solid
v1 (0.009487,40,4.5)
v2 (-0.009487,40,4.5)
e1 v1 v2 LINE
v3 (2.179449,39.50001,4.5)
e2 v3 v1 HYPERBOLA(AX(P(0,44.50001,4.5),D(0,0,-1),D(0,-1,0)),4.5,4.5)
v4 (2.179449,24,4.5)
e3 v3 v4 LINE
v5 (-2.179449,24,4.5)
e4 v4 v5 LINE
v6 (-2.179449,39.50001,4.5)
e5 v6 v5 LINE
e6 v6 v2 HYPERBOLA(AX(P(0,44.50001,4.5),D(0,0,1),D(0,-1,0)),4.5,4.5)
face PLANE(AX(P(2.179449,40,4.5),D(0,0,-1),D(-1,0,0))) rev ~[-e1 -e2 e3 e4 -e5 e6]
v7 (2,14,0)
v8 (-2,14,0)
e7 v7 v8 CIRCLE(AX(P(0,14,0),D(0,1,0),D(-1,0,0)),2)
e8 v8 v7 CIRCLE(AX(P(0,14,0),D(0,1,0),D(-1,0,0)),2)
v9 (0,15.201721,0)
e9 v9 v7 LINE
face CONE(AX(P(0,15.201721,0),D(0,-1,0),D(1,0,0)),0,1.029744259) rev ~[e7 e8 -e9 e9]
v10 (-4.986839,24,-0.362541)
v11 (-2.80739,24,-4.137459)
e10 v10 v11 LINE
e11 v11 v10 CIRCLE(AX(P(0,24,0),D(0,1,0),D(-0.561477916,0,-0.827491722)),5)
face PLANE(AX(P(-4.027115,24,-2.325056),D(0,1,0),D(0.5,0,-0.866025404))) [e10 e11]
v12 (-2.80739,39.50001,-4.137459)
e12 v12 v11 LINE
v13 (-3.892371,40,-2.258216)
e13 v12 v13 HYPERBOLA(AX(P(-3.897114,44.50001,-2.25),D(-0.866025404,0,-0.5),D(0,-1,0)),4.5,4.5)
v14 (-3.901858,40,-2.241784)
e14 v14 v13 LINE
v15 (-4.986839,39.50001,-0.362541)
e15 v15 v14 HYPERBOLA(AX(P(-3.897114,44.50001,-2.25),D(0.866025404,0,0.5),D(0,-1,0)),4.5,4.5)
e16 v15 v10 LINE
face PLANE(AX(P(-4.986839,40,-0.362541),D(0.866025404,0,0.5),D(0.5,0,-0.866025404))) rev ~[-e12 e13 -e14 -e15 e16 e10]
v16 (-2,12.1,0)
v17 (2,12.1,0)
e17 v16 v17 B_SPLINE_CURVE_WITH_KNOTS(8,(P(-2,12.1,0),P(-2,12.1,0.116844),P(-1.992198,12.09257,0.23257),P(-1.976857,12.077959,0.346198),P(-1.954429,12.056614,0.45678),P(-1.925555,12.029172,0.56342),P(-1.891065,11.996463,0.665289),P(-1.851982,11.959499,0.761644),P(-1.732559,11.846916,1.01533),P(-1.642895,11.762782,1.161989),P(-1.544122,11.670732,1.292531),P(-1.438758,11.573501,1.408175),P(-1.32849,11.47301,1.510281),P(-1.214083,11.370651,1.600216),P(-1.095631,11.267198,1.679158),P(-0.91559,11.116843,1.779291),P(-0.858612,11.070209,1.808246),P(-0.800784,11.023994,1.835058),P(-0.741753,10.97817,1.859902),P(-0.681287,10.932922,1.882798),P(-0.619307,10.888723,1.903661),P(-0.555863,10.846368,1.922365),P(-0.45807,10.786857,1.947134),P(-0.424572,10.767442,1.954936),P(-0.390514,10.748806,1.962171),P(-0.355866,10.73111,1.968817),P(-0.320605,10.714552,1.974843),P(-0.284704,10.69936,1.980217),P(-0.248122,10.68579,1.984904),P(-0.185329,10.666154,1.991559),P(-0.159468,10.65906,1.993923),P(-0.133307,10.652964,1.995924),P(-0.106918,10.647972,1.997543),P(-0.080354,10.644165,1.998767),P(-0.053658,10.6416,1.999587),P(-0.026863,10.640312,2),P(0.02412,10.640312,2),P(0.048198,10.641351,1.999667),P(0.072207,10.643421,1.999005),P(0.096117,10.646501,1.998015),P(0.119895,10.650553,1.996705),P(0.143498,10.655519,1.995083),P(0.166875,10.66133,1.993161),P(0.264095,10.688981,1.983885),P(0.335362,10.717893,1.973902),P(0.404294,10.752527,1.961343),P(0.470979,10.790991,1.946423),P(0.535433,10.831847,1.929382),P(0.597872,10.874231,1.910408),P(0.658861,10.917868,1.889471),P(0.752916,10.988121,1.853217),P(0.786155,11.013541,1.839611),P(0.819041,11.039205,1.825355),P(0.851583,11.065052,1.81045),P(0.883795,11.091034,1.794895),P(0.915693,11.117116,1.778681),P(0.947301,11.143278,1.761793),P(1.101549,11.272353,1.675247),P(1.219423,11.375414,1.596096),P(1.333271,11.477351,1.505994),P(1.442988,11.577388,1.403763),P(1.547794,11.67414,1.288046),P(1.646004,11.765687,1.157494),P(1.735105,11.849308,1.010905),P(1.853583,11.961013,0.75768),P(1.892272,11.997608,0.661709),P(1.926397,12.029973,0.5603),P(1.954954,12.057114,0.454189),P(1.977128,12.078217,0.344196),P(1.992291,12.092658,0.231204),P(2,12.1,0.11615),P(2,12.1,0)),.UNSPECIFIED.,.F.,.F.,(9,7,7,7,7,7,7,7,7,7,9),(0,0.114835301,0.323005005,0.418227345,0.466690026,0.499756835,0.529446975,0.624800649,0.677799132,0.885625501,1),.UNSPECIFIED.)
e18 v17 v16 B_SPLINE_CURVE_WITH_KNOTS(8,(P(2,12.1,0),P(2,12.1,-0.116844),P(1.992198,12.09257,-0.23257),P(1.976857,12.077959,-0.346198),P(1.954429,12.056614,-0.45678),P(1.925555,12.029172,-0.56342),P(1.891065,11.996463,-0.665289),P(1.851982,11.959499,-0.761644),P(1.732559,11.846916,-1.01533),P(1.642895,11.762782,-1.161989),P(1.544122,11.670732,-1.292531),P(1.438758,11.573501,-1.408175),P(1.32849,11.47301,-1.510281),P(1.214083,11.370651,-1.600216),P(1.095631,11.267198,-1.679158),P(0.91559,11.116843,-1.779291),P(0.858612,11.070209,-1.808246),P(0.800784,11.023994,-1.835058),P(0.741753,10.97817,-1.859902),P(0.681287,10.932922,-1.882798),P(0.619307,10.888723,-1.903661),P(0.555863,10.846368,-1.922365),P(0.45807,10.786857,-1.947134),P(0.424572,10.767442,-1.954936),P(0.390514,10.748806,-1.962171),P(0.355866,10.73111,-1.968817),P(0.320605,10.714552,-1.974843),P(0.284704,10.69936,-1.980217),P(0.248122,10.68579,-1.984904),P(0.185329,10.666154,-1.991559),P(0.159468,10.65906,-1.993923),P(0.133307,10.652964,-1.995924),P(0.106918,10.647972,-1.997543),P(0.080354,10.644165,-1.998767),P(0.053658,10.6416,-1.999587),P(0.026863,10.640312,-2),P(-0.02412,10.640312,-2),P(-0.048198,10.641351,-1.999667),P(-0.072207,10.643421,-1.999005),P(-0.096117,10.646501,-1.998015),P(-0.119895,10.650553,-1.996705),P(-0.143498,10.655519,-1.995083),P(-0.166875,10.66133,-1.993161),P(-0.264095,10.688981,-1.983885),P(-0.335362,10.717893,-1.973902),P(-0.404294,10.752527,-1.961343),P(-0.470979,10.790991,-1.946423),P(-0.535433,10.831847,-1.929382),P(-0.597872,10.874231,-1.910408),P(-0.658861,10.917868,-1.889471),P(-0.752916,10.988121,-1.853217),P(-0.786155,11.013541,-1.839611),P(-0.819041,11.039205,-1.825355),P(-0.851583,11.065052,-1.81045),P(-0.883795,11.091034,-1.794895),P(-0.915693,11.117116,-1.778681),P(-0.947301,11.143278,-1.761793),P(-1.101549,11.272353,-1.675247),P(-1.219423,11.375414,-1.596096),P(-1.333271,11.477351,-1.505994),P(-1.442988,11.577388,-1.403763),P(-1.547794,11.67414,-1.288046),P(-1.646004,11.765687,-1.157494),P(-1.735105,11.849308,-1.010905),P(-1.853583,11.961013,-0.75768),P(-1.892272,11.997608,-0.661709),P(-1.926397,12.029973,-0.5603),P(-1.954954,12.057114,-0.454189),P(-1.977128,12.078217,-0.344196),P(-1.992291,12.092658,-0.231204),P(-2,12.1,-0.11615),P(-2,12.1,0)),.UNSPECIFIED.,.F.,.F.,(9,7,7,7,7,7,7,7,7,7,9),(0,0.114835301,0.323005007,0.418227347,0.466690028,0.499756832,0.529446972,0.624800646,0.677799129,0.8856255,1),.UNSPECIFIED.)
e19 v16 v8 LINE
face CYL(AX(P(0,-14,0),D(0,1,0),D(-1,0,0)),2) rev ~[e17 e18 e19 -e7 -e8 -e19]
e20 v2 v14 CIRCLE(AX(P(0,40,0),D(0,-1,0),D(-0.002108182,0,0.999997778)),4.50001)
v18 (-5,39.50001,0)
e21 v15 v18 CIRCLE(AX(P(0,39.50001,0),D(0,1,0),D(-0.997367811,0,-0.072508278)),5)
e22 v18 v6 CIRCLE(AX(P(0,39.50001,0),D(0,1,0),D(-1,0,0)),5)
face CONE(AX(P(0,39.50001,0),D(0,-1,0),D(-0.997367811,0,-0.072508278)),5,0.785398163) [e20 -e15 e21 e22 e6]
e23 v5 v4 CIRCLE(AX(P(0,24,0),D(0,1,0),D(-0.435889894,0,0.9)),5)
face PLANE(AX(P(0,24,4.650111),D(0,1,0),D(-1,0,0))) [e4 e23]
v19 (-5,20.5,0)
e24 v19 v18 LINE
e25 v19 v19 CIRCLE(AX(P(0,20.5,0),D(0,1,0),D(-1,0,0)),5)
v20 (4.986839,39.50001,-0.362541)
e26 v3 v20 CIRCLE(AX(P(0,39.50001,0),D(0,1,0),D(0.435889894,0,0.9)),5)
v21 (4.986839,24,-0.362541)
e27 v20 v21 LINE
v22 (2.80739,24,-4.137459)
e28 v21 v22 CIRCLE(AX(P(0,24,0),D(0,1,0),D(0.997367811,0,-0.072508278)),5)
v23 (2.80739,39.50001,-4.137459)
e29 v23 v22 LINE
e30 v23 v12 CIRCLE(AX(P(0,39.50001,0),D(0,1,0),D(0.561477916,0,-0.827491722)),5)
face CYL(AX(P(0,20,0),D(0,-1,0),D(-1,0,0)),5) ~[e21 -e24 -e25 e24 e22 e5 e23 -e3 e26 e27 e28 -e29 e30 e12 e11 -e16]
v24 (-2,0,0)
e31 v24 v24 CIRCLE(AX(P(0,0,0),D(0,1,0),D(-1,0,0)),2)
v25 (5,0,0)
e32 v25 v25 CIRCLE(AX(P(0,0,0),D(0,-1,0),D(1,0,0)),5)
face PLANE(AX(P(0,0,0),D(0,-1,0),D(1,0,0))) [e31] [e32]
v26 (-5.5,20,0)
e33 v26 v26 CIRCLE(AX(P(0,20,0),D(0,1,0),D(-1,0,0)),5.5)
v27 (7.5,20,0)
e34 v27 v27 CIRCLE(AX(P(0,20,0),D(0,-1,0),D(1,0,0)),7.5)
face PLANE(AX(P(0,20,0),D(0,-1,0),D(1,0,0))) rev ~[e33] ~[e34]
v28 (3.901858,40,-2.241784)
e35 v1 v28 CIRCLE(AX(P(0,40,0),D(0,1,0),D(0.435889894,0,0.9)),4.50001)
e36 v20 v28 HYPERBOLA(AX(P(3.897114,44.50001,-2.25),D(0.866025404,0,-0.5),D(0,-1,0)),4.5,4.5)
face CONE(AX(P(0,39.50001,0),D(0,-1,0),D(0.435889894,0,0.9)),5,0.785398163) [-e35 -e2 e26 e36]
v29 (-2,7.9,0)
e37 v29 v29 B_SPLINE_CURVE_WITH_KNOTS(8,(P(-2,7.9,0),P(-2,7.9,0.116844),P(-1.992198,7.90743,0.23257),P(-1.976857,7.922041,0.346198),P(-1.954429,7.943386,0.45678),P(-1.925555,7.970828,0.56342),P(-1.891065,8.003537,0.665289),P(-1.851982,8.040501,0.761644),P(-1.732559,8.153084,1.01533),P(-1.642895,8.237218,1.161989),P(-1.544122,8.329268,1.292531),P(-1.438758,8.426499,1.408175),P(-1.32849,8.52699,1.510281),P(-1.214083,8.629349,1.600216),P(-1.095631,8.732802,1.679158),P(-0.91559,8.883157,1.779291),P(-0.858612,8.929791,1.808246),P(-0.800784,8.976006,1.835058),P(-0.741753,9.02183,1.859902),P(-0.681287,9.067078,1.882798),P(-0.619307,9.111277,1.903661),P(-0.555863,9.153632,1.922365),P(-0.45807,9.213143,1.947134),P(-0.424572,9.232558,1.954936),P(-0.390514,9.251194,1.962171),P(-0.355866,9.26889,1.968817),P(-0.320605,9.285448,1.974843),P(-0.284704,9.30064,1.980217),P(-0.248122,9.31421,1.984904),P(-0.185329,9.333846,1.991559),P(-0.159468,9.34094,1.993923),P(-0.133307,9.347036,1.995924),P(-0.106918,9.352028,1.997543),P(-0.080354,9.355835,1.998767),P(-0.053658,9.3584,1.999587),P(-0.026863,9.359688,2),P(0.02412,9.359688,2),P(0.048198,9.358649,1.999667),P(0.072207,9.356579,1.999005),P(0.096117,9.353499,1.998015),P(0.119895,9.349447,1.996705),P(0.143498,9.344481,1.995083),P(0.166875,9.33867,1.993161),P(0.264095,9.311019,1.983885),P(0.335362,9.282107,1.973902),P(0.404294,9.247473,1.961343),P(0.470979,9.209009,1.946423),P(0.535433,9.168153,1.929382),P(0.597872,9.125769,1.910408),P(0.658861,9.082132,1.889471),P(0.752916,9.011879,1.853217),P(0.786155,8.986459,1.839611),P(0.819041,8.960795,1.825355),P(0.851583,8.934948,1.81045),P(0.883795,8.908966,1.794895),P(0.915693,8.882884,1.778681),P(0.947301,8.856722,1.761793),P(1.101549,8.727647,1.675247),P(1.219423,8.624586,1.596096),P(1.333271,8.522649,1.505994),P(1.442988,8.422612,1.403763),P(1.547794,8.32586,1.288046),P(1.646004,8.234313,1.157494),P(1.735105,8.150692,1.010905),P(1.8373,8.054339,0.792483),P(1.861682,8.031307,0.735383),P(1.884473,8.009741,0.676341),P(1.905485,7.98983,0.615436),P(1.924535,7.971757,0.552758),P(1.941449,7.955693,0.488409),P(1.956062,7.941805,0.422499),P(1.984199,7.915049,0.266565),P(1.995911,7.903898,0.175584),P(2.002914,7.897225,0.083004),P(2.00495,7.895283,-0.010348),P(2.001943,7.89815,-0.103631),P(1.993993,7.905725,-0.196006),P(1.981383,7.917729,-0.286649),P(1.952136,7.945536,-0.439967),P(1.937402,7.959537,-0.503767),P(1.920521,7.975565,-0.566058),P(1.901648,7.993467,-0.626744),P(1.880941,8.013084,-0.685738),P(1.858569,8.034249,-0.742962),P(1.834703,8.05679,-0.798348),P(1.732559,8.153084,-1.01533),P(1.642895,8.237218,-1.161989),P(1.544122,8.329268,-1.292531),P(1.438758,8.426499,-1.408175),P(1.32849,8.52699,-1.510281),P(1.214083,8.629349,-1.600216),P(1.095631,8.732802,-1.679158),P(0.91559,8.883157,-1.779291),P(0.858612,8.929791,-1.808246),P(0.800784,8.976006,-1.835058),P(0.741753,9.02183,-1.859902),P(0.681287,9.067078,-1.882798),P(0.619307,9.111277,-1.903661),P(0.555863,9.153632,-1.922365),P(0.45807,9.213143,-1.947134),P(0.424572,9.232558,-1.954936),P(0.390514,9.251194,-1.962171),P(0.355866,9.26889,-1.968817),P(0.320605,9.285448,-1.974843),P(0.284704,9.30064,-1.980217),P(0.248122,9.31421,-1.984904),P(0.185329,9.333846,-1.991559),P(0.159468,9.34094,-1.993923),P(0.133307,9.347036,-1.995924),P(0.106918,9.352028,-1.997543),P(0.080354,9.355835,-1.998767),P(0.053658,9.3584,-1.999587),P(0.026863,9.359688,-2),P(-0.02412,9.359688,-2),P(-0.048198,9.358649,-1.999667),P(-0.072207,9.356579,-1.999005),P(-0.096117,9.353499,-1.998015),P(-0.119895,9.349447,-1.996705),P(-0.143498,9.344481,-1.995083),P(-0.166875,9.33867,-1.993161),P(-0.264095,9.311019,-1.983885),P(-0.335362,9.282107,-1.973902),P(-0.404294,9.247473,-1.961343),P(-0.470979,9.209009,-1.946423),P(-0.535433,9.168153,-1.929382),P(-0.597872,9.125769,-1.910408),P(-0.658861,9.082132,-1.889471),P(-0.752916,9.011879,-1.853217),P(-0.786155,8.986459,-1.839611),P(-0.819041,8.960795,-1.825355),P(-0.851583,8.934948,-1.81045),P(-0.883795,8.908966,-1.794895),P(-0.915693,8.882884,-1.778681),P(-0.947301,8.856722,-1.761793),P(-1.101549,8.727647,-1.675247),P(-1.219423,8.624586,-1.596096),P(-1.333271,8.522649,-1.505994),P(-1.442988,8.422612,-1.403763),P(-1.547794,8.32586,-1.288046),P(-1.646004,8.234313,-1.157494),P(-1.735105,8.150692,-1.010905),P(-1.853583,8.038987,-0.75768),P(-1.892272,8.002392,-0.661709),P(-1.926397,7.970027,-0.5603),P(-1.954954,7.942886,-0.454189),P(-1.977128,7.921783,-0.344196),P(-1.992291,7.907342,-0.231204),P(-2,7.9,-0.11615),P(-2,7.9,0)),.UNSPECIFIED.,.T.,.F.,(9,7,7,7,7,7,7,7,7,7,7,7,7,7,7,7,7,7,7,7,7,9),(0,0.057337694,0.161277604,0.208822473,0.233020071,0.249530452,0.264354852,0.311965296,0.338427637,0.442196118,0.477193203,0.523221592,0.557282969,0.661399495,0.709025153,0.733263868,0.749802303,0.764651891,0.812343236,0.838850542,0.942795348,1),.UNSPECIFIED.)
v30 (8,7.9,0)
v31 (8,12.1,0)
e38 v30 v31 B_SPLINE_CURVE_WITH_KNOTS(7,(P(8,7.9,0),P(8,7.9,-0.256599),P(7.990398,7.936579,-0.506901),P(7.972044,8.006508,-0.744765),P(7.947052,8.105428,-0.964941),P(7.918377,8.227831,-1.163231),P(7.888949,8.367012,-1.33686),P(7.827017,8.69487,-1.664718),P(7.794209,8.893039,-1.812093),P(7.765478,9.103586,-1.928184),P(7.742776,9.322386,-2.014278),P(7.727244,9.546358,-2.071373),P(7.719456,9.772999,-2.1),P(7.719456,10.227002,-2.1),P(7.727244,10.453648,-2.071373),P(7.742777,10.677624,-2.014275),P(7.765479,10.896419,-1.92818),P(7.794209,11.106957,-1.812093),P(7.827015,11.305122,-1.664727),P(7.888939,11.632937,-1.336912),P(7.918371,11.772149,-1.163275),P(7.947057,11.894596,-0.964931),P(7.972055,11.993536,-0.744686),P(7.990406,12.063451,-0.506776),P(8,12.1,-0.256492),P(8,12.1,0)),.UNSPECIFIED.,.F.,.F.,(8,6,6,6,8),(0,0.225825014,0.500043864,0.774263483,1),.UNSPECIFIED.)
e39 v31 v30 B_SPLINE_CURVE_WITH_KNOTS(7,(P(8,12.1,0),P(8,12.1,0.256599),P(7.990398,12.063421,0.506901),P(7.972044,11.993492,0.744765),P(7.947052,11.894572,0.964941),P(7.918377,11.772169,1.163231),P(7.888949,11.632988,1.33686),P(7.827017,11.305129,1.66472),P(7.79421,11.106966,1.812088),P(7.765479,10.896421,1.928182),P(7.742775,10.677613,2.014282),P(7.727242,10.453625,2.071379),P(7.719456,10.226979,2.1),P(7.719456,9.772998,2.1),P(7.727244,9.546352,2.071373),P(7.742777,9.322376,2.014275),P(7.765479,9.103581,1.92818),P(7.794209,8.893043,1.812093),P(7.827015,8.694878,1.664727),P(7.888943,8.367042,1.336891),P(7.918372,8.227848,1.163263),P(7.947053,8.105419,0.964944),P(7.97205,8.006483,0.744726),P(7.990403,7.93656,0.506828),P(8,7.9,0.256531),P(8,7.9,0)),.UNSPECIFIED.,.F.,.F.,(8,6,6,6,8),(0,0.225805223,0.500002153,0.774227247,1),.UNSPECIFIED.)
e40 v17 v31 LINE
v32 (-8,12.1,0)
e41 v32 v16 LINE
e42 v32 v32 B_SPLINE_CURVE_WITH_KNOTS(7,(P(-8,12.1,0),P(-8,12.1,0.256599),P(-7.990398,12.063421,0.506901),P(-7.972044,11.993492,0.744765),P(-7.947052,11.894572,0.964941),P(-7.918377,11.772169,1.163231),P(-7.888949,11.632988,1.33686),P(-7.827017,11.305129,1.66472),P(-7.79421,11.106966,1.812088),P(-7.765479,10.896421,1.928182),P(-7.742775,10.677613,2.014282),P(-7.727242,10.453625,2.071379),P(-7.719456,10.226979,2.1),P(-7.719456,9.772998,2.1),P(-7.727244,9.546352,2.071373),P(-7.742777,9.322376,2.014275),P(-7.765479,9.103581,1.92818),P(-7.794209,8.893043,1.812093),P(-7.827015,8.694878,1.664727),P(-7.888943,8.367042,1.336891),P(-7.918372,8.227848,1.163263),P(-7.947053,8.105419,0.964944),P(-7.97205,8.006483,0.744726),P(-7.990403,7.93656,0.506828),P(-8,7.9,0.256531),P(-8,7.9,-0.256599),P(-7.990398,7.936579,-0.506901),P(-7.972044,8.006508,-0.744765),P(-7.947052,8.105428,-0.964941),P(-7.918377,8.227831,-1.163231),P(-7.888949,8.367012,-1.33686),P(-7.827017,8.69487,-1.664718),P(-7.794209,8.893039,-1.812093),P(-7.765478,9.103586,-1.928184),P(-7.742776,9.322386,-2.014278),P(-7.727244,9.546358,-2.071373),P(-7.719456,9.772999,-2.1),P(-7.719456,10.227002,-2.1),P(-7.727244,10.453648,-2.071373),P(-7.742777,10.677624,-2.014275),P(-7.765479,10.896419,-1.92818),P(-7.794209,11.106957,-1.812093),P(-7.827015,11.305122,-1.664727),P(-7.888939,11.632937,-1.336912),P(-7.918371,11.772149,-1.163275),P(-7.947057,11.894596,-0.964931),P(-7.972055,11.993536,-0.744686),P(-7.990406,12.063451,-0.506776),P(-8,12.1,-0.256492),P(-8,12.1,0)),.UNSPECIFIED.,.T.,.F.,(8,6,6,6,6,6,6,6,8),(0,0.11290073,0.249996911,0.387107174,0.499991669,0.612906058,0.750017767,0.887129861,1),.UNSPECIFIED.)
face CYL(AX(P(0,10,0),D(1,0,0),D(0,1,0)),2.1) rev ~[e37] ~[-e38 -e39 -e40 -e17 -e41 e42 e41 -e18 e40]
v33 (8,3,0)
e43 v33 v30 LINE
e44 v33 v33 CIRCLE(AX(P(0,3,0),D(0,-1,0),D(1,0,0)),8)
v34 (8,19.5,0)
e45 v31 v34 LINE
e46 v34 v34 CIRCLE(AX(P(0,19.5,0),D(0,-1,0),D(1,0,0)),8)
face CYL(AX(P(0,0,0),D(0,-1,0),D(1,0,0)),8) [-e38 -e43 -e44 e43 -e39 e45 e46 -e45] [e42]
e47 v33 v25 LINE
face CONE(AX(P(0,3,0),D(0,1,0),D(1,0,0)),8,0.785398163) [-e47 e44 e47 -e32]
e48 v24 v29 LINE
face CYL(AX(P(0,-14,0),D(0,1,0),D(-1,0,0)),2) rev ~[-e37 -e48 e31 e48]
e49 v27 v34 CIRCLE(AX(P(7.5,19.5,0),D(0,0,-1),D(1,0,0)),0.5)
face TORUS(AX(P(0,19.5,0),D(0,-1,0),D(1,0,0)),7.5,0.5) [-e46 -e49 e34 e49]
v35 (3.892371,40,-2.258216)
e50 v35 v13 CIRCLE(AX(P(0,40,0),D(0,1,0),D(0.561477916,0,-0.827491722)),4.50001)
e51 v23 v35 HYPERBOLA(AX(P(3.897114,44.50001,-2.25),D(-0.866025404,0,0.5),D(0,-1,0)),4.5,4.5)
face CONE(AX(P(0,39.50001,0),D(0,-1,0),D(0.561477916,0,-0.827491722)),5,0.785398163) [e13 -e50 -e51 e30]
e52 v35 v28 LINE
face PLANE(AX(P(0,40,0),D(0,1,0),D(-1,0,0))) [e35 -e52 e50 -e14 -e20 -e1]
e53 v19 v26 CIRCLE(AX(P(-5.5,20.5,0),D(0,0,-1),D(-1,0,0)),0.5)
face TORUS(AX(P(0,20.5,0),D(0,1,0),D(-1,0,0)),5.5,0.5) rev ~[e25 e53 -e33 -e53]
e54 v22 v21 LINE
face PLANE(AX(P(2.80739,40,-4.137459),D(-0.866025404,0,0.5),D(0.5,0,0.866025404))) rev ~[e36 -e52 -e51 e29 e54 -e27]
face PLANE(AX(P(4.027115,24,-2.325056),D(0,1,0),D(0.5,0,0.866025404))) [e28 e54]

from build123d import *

# Parameters (mm, degrees)
F0_R            = 8
F1_DEPTH        = 20
F2_R            = 5
F3_DEPTH        = 20
F5_DEPTH        = 16
F5_COPIES_COUNT = 3
F6_SIZE         = 0.49999
F7_R            = 0.5
F9_D            = 4
F9_DEPTH        = 14
F9_TIP          = 1.2017212381
F10_R           = 2.1
F11_DEPTH       = 8.25
F12_SIZE        = 3


# Not quite as in the source:
# - a fillet or chamfer is up to 0.001 mm smaller than in the source, because OpenCascade refuses the exact size
# - a pattern or mirror of a feature is missing from the dataset's text; its kind, count and spacing are read off the source's solid


with BuildPart() as f1:
    # F0 (on Front) → F1 (new body)
    with BuildSketch(Plane.XZ):
        Circle(F0_R)
    extrude(amount=-F1_DEPTH)

    # F2 (on face) → F3 (join)
    with BuildSketch(Plane(origin=(0, 20, 0), x_dir=(-1, 0, 0), z_dir=(0, 1, 0))):
        Circle(F2_R)
    extrude(amount=F3_DEPTH)

    # F4 (on face) → F5 (cut)
    with BuildSketch(Plane(origin=(0, 40, 0), x_dir=(-1, 0, 0), z_dir=(0, 1, 0))):
        with BuildLine():
            ThreePointArc((2.1794494718, 4.5), (0, 5), (-2.1794494718, 4.5))
            Line((-2.1794494718, 4.5), (2.1794494718, 4.5))
        make_face()
    f5 = extrude(amount=-F5_DEPTH, mode=Mode.SUBTRACT)

    # F5_copies: F5 ×3 about axis
    f5_copies_axis = Axis((0, 0, 0), (0, 1, 0))
    for i in range(1, F5_COPIES_COUNT):
        add(f5.rotate(f5_copies_axis, i * 360 / F5_COPIES_COUNT), mode=Mode.SUBTRACT)

    # F6 (size 0.5 in the source; OpenCascade refuses exactly that, so slightly less here)
    f6_edges = [f1.edges().sort_by_distance(p)[0] for p in [
        (4.330127, 40, 2.5),
        (-4.996709, 40, -0.18139),
        (0, 40, -5),
        (-4.236582, 40, 2.655443),
    ]]
    chamfer(f6_edges, length=F6_SIZE)

    # F7
    f7_edges = [f1.edges().sort_by_distance(p)[0] for p in [
        (-8, 20, 0),
        (5, 20, 0),
    ]]
    fillet(f7_edges, radius=F7_R)

    # F9
    with Locations(Plane.XZ):
        with Locations((0, 0)):
            Hole(F9_D / 2, depth=F9_DEPTH)
            with Locations((0, 0, -(F9_DEPTH + F9_TIP / 2))):  # 118° drill point
                Cone(0, F9_D / 2, F9_TIP, mode=Mode.SUBTRACT)

    # F10 (on Right) → F11 (cut, symmetric)
    with BuildSketch(Plane.YZ):
        with Locations((10, 0)):
            Circle(F10_R)
    extrude(amount=F11_DEPTH, both=True, mode=Mode.SUBTRACT)

    # F12
    f12_edges = [f1.edges().sort_by_distance(p)[0] for p in [
        (-8, 0, 0),
    ]]
    chamfer(f12_edges, length=F12_SIZE)


solid = f1.part
